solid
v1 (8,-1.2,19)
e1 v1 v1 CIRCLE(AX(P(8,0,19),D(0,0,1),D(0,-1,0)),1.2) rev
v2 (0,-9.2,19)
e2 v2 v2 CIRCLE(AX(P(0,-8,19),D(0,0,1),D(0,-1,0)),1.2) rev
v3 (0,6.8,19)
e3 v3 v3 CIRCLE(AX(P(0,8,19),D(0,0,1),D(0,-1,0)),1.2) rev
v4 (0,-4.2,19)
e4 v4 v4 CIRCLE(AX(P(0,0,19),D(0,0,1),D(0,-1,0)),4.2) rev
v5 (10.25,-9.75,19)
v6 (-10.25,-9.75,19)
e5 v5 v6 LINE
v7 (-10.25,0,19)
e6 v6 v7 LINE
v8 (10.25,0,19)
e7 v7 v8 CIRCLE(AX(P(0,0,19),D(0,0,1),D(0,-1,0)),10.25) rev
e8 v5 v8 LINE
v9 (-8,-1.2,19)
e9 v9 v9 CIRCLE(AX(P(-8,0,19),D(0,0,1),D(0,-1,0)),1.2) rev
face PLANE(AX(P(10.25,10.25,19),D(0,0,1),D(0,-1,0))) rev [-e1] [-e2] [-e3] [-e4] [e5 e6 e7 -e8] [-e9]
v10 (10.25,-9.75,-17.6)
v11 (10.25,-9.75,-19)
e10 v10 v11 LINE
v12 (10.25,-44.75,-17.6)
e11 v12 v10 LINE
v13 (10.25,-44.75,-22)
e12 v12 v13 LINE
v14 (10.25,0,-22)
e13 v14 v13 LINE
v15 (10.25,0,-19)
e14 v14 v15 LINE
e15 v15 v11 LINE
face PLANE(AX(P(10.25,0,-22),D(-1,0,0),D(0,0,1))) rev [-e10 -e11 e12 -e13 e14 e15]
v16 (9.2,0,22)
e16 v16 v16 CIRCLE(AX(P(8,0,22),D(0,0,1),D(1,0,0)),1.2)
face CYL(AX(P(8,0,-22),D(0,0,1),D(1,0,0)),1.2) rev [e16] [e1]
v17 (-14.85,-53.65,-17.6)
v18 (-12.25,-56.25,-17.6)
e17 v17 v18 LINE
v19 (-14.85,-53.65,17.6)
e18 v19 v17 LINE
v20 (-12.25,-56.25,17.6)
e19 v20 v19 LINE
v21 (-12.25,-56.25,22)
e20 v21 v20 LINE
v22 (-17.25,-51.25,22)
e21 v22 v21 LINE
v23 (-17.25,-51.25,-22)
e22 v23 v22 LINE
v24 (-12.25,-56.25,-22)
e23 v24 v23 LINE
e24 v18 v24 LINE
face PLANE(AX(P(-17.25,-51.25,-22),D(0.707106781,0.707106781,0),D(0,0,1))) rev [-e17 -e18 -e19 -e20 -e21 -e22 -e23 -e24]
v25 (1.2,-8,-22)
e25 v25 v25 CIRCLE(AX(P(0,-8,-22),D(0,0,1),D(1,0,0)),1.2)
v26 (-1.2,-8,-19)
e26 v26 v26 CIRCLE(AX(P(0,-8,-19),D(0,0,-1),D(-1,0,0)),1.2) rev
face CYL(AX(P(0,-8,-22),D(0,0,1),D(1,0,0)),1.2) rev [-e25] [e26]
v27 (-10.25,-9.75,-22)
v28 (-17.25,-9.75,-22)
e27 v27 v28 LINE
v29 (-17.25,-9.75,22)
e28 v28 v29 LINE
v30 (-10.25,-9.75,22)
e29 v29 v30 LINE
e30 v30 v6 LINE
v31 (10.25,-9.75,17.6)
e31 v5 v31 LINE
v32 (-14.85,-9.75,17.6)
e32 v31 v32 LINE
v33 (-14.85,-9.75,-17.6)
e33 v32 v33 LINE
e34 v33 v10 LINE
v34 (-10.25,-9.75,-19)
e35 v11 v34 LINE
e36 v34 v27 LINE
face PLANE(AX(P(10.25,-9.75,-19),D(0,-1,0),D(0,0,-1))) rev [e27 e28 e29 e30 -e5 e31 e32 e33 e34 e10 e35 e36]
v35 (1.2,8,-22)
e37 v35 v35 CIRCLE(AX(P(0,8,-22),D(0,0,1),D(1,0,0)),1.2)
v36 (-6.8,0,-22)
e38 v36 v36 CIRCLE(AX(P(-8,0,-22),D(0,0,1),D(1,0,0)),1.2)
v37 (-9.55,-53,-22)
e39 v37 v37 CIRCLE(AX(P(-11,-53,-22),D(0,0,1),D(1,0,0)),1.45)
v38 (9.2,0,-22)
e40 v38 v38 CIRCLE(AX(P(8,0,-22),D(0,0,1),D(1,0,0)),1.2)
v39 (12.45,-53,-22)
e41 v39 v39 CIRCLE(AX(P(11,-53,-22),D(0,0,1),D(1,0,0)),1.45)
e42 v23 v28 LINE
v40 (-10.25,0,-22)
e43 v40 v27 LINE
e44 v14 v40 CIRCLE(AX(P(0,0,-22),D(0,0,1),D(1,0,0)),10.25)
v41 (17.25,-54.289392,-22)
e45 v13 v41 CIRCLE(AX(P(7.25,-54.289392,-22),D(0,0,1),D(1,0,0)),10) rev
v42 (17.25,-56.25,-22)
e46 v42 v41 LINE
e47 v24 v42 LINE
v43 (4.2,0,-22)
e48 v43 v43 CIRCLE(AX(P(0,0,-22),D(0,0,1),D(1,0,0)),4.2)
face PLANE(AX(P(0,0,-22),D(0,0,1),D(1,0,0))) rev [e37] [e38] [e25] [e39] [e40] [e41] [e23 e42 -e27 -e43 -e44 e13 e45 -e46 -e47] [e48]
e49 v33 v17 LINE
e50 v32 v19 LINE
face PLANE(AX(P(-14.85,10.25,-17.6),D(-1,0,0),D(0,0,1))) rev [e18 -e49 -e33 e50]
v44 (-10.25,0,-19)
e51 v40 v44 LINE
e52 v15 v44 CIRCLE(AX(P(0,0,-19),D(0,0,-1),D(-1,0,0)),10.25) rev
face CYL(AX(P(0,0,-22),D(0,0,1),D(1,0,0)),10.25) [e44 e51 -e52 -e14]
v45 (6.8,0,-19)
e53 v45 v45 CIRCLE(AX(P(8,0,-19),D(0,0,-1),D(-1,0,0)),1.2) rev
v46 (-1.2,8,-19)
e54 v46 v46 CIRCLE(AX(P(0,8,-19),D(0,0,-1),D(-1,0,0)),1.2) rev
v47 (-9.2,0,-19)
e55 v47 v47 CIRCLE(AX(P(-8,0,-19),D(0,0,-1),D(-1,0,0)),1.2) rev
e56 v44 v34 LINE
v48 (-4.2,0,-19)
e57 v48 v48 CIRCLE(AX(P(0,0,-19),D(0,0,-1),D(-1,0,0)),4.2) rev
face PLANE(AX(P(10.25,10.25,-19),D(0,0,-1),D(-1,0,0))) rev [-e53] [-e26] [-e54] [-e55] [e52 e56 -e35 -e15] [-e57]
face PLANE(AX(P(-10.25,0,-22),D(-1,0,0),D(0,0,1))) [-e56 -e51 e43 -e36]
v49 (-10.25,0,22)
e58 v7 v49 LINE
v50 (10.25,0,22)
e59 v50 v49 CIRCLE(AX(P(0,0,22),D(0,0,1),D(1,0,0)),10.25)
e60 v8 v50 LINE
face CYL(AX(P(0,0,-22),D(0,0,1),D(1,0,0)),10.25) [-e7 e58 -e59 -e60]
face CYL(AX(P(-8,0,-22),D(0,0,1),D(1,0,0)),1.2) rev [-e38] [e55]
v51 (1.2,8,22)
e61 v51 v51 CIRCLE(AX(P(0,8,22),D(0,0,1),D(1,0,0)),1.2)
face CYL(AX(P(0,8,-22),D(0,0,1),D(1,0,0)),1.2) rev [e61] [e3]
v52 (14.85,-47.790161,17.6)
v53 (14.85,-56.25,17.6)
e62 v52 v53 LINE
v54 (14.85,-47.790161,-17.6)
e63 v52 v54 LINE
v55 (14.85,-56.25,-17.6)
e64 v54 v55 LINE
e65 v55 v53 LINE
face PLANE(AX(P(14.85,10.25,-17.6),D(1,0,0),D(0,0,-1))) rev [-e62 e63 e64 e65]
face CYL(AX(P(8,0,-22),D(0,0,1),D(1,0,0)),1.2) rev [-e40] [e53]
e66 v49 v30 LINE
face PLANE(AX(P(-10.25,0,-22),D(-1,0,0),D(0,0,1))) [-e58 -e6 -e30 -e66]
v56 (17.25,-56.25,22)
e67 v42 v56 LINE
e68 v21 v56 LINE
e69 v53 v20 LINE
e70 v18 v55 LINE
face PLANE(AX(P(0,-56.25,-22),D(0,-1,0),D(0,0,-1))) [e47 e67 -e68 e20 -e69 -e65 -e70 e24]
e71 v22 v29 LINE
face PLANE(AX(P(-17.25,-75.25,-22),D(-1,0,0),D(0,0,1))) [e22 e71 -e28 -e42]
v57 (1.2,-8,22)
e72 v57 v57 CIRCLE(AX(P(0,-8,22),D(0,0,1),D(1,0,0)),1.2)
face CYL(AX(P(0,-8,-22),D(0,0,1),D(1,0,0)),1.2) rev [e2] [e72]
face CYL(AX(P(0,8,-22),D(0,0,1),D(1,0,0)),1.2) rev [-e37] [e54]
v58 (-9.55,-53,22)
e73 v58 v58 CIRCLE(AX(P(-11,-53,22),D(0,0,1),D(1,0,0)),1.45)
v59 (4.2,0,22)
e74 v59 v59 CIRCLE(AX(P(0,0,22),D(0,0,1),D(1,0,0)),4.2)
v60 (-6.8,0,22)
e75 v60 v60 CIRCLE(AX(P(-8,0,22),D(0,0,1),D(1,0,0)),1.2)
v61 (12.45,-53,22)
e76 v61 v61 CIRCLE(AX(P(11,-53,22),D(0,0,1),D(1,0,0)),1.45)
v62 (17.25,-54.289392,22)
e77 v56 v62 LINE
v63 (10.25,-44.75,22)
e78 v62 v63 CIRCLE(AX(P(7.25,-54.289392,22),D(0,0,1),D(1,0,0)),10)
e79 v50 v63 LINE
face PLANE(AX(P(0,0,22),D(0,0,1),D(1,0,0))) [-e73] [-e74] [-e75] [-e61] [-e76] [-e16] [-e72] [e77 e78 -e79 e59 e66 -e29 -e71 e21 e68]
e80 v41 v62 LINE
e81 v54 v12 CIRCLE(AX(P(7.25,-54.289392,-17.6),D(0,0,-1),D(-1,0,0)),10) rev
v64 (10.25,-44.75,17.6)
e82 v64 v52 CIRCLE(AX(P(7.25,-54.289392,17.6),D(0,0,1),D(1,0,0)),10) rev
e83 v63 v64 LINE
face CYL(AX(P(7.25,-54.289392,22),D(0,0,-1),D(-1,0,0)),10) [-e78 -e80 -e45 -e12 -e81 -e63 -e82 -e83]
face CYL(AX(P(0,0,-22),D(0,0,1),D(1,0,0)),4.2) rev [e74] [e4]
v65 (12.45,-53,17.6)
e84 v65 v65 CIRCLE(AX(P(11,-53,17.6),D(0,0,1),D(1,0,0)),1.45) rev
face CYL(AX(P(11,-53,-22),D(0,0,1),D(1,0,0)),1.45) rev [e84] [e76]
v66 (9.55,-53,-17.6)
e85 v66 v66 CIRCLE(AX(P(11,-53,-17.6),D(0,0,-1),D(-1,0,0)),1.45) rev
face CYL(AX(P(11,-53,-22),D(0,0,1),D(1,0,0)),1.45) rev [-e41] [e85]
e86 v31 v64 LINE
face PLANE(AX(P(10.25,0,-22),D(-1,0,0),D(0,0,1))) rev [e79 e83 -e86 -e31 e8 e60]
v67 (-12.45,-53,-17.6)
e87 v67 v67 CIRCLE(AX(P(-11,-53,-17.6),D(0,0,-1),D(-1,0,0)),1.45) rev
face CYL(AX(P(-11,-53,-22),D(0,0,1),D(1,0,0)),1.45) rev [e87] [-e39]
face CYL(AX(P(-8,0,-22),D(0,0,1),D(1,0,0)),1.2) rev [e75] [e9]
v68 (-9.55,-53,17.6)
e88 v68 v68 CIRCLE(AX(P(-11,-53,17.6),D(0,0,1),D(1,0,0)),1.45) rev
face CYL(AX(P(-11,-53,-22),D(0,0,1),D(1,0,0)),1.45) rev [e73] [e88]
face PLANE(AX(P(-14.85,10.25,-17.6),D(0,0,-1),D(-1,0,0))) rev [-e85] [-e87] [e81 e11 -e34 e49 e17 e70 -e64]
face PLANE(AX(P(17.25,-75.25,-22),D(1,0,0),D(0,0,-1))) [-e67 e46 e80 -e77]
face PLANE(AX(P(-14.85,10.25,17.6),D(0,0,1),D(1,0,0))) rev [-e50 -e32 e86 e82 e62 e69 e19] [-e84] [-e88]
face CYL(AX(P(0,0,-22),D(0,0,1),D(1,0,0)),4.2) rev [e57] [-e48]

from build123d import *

# Parameters (mm, degrees)
BOSS_EXTRUDE1_DEPTH      = 22
BOSS_EXTRUDE1_DEPTH_BACK = 22
SKETCH2_W                = 38
SKETCH2_H                = 20
CUT_EXTRUDE1_DEPTH       = 105.423416914
SKETCH3_W                = 7
SKETCH3_H                = 44
BOSS_EXTRUDE2_DEPTH      = 65.5
SKETCH23_R               = 5
SKETCH23_R_2             = 1.2
CUT_EXTRUDE2_DEPTH       = 111.605436123
SKETCH24_W               = 28.5
SKETCH24_H               = 34
CUT_EXTRUDE3_DEPTH       = 90.954502389
SKETCH26_R               = 1.2
SKETCH26_R_2             = 5
SKETCH26_R_3             = 1.45
CUT_EXTRUDE6_DEPTH       = 107.330263801
SKETCH27_W               = 29.7
SKETCH27_H               = 35.2
CUT_EXTRUDE8_DEPTH       = 73.137455597
SKETCH29_W               = 7
SKETCH29_H               = 35
CUT_EXTRUDE10_DEPTH      = 74.468530678
CHAMFER2_SIZE            = 5
FILLET1_START            = -23
FILLET1_DEPTH            = 46


with BuildPart() as part:
    # Sketch1 → Boss-Extrude1 (new, two sides: drawn at the far end of the back side and taken through both)
    with BuildSketch(Plane.XY.offset(-BOSS_EXTRUDE1_DEPTH_BACK)):
        with BuildLine():
            Line((10.25, -60), (10.25, 0))
            ThreePointArc((10.25, 0), (0, -10.25), (-10.25, 0))
            Line((-10.25, 0), (-10.25, -60))
            Line((-10.25, -60), (-10.25, -100))
            Line((-10.25, -100), (10.25, -100))
            Line((10.25, -100), (10.25, -60))
        make_face()
        with BuildLine():
            Line((10.25, 0), (9.2, 0))
            ThreePointArc((9.2, 0), (8.816088231, -0.879772698), (7.91, -1.196620241))
            ThreePointArc((7.91, -1.196620241), (5.656854249, -5.656854249), (1.196620241, -7.91))
            ThreePointArc((1.196620241, -7.91), (1.199154762, -7.954968281), (1.2, -8))
            ThreePointArc((1.2, -8), (-0.045031719, -9.199154762), (-1.196620241, -7.91))
            ThreePointArc((-1.196620241, -7.91), (-5.656854249, -5.656854249), (-7.91, -1.196620241))
            ThreePointArc((-7.91, -1.196620241), (-8.816088231, -0.879772698), (-9.2, 0))
            Line((-9.2, 0), (-10.25, 0))
            ThreePointArc((-10.25, 0), (0, -10.25), (10.25, 0))
        make_face()
        with BuildLine():
            ThreePointArc((7.91, -1.196620241), (7.120227302, -0.816088231), (6.8, 0))
            Line((6.8, 0), (4.2, 0))
            ThreePointArc((4.2, 0), (0, -4.2), (-4.2, 0))
            Line((-4.2, 0), (-6.8, 0))
            ThreePointArc((-6.8, 0), (-7.120227302, -0.816088231), (-7.91, -1.196620241))
            ThreePointArc((-7.91, -1.196620241), (-5.656854249, -5.656854249), (-1.196620241, -7.91))
            ThreePointArc((-1.196620241, -7.91), (0, -6.8), (1.196620241, -7.91))
            ThreePointArc((1.196620241, -7.91), (5.656854249, -5.656854249), (7.91, -1.196620241))
        make_face()
        with BuildLine():
            Line((4.2, 0), (6.8, 0))
            ThreePointArc((6.8, 0), (7.120227302, 0.816088231), (7.91, 1.196620241))
            ThreePointArc((7.91, 1.196620241), (5.656854249, 5.656854249), (1.196620241, 7.91))
            ThreePointArc((1.196620241, 7.91), (0, 6.8), (-1.196620241, 7.91))
            ThreePointArc((-1.196620241, 7.91), (-5.656854249, 5.656854249), (-7.91, 1.196620241))
            ThreePointArc((-7.91, 1.196620241), (-7.120227302, 0.816088231), (-6.8, 0))
            Line((-6.8, 0), (-4.2, 0))
            ThreePointArc((-4.2, 0), (0, 4.2), (4.2, 0))
        make_face()
        with BuildLine():
            ThreePointArc((7.91, 1.196620241), (8.816088231, 0.879772698), (9.2, 0))
            Line((9.2, 0), (10.25, 0))
            ThreePointArc((10.25, 0), (0, 10.25), (-10.25, 0))
            Line((-10.25, 0), (-9.2, 0))
            ThreePointArc((-9.2, 0), (-8.816088231, 0.879772698), (-7.91, 1.196620241))
            ThreePointArc((-7.91, 1.196620241), (-5.656854249, 5.656854249), (-1.196620241, 7.91))
            ThreePointArc((-1.196620241, 7.91), (-0.045031719, 9.199154762), (1.2, 8))
            ThreePointArc((1.2, 8), (1.199154762, 7.954968281), (1.196620241, 7.91))
            ThreePointArc((1.196620241, 7.91), (5.656854249, 5.656854249), (7.91, 1.196620241))
        make_face()
    extrude(amount=BOSS_EXTRUDE1_DEPTH + BOSS_EXTRUDE1_DEPTH_BACK)

    # Sketch2 → Cut-Extrude1 (cut, through all)
    with BuildSketch(Plane.ZY.offset(10.25)):
        with Locations((0, 0.25)):
            Rectangle(SKETCH2_W, SKETCH2_H)
    extrude(amount=-CUT_EXTRUDE1_DEPTH, mode=Mode.SUBTRACT)

    # Sketch3 → Boss-Extrude2 (add)
    with BuildSketch(Plane(origin=(0, -9.75, 0), x_dir=(1, 0, 0), z_dir=(0, 1, 0))):
        with Locations((-13.75, 0)):
            Rectangle(SKETCH3_W, SKETCH3_H)
        with Locations((13.75, 0)):
            Rectangle(SKETCH3_W, SKETCH3_H)
    extrude(amount=-BOSS_EXTRUDE2_DEPTH)

    # Sketch23 → Cut-Extrude2 (cut, through all)
    with BuildSketch(Plane.XY.offset(22)):
        with BuildLine():
            Line((-10.25, -100), (10.25, -100))
            Line((10.25, -100), (10.25, -85))
            ThreePointArc((10.25, -85), (0, -95.25), (-10.25, -85))
            Line((-10.25, -85), (-10.25, -100))
        make_face()
        with Locations((0, -85)):
            Circle(SKETCH23_R)
        with Locations((8, -85)):
            Circle(SKETCH23_R_2)
        with Locations((0, -77)):
            Circle(SKETCH23_R_2)
        with Locations((0, -93)):
            Circle(SKETCH23_R_2)
        with Locations((-8, -85)):
            Circle(SKETCH23_R_2)
    extrude(amount=-CUT_EXTRUDE2_DEPTH, mode=Mode.SUBTRACT)

    # Sketch24 → Cut-Extrude3 (cut, through all)
    with BuildSketch(Plane(origin=(0, -9.75, 0), x_dir=(1, 0, 0), z_dir=(0, 1, 0))):
        Rectangle(SKETCH24_W, SKETCH24_H)
    extrude(amount=-CUT_EXTRUDE3_DEPTH, mode=Mode.SUBTRACT)

    # Sketch26 → Cut-Extrude6 (cut, through all)
    # profile 1 of 5: a face of its own
    with BuildSketch(Plane.XY.offset(22)):
        with BuildLine():
            Line((10.25, -75.25), (14.25, -75.25))
            Line((14.25, -75.25), (14.25, -56.53282359))
            Line((14.25, -56.53282359), (14.25, -56.25))
            Line((14.25, -56.25), (-14.25, -56.25))
            Line((-14.25, -56.25), (-14.25, -56.53282359))
            Line((-14.25, -56.53282359), (-14.25, -75.25))
            Line((-14.25, -75.25), (-10.25, -75.25))
            Line((-10.25, -75.25), (-10.25, -85))
            ThreePointArc((-10.25, -85), (0, -95.25), (10.25, -85))
            Line((10.25, -85), (10.25, -75.25))
        make_face()
        with Locations((-8, -85)):
            Circle(SKETCH26_R, mode=Mode.SUBTRACT)
        with Locations((0, -85)):
            Circle(SKETCH26_R_2, mode=Mode.SUBTRACT)
        with Locations((0, -77)):
            Circle(SKETCH26_R, mode=Mode.SUBTRACT)
        with Locations((0, -93)):
            Circle(SKETCH26_R, mode=Mode.SUBTRACT)
        with Locations((8, -85)):
            Circle(SKETCH26_R, mode=Mode.SUBTRACT)
    # profile 2 of 5: a face of its own
    with BuildSketch(Plane.XY.offset(22)):
        Polygon((-17.25, -75.25), (-14.25, -75.25), (-14.25, -56.53282359), (-14.25, -56.25), (-17.25, -56.25), align=None)
    # profile 3 of 5: a face of its own
    with BuildSketch(Plane.XY.offset(22)):
        Polygon((14.25, -56.53282359), (14.25, -75.25), (17.25, -75.25), (17.25, -56.25), (14.25, -56.25), align=None)
    # profile 4 of 5: a face of its own
    with BuildSketch(Plane.XY.offset(22)):
        with Locations((-11, -53)):
            Circle(SKETCH26_R_3)
    # profile 5 of 5: a face of its own
    with BuildSketch(Plane.XY.offset(22)):
        with Locations((11, -53)):
            Circle(SKETCH26_R_3)
    extrude(amount=-CUT_EXTRUDE6_DEPTH, mode=Mode.SUBTRACT)

    # Sketch27 → Cut-Extrude8 (cut, through all)
    with BuildSketch(Plane.XZ.offset(56.25)):
        Rectangle(SKETCH27_W, SKETCH27_H)
    extrude(amount=-CUT_EXTRUDE8_DEPTH, mode=Mode.SUBTRACT)

    # Sketch29 → Cut-Extrude10 (cut, through all)
    with BuildSketch(Plane(origin=(0, 0, -22), x_dir=(-1, 0, 0), z_dir=(0, 0, -1))):
        with Locations((-13.75, -27.25)):
            Rectangle(SKETCH29_W, SKETCH29_H)
    extrude(amount=-CUT_EXTRUDE10_DEPTH, mode=Mode.SUBTRACT)

    # Chamfer2
    # the kernel refuses this chamfer: 5 mm, written as the material it takes off along each edge
    with BuildSketch(Plane(origin=(-17.25, -56.25, 34.85841494), x_dir=(1, 0, 0), z_dir=(0, 0, -1))) as chamfer2_piece_1:
        Polygon((CHAMFER2_SIZE, 0), (0, -CHAMFER2_SIZE), (0, 0), align=None)
    extrude(amount=69.71682988, mode=Mode.SUBTRACT)

    # Fillet1: read off the stored shape, not the designer's step
    # Fillet1 outline → Fillet1 (cut)
    with BuildSketch(Plane.XY.offset(FILLET1_START)):
        with BuildLine():
            ThreePointArc((10.25, -44.75), (15.312257748, -48.373312231), (17.25, -54.289392014))
            Line((17.25, -54.289392014), (17.25, -44.75))
            Line((17.25, -44.75), (10.25, -44.75))
        make_face()
    extrude(amount=FILLET1_DEPTH, mode=Mode.SUBTRACT)


solid = part.part
